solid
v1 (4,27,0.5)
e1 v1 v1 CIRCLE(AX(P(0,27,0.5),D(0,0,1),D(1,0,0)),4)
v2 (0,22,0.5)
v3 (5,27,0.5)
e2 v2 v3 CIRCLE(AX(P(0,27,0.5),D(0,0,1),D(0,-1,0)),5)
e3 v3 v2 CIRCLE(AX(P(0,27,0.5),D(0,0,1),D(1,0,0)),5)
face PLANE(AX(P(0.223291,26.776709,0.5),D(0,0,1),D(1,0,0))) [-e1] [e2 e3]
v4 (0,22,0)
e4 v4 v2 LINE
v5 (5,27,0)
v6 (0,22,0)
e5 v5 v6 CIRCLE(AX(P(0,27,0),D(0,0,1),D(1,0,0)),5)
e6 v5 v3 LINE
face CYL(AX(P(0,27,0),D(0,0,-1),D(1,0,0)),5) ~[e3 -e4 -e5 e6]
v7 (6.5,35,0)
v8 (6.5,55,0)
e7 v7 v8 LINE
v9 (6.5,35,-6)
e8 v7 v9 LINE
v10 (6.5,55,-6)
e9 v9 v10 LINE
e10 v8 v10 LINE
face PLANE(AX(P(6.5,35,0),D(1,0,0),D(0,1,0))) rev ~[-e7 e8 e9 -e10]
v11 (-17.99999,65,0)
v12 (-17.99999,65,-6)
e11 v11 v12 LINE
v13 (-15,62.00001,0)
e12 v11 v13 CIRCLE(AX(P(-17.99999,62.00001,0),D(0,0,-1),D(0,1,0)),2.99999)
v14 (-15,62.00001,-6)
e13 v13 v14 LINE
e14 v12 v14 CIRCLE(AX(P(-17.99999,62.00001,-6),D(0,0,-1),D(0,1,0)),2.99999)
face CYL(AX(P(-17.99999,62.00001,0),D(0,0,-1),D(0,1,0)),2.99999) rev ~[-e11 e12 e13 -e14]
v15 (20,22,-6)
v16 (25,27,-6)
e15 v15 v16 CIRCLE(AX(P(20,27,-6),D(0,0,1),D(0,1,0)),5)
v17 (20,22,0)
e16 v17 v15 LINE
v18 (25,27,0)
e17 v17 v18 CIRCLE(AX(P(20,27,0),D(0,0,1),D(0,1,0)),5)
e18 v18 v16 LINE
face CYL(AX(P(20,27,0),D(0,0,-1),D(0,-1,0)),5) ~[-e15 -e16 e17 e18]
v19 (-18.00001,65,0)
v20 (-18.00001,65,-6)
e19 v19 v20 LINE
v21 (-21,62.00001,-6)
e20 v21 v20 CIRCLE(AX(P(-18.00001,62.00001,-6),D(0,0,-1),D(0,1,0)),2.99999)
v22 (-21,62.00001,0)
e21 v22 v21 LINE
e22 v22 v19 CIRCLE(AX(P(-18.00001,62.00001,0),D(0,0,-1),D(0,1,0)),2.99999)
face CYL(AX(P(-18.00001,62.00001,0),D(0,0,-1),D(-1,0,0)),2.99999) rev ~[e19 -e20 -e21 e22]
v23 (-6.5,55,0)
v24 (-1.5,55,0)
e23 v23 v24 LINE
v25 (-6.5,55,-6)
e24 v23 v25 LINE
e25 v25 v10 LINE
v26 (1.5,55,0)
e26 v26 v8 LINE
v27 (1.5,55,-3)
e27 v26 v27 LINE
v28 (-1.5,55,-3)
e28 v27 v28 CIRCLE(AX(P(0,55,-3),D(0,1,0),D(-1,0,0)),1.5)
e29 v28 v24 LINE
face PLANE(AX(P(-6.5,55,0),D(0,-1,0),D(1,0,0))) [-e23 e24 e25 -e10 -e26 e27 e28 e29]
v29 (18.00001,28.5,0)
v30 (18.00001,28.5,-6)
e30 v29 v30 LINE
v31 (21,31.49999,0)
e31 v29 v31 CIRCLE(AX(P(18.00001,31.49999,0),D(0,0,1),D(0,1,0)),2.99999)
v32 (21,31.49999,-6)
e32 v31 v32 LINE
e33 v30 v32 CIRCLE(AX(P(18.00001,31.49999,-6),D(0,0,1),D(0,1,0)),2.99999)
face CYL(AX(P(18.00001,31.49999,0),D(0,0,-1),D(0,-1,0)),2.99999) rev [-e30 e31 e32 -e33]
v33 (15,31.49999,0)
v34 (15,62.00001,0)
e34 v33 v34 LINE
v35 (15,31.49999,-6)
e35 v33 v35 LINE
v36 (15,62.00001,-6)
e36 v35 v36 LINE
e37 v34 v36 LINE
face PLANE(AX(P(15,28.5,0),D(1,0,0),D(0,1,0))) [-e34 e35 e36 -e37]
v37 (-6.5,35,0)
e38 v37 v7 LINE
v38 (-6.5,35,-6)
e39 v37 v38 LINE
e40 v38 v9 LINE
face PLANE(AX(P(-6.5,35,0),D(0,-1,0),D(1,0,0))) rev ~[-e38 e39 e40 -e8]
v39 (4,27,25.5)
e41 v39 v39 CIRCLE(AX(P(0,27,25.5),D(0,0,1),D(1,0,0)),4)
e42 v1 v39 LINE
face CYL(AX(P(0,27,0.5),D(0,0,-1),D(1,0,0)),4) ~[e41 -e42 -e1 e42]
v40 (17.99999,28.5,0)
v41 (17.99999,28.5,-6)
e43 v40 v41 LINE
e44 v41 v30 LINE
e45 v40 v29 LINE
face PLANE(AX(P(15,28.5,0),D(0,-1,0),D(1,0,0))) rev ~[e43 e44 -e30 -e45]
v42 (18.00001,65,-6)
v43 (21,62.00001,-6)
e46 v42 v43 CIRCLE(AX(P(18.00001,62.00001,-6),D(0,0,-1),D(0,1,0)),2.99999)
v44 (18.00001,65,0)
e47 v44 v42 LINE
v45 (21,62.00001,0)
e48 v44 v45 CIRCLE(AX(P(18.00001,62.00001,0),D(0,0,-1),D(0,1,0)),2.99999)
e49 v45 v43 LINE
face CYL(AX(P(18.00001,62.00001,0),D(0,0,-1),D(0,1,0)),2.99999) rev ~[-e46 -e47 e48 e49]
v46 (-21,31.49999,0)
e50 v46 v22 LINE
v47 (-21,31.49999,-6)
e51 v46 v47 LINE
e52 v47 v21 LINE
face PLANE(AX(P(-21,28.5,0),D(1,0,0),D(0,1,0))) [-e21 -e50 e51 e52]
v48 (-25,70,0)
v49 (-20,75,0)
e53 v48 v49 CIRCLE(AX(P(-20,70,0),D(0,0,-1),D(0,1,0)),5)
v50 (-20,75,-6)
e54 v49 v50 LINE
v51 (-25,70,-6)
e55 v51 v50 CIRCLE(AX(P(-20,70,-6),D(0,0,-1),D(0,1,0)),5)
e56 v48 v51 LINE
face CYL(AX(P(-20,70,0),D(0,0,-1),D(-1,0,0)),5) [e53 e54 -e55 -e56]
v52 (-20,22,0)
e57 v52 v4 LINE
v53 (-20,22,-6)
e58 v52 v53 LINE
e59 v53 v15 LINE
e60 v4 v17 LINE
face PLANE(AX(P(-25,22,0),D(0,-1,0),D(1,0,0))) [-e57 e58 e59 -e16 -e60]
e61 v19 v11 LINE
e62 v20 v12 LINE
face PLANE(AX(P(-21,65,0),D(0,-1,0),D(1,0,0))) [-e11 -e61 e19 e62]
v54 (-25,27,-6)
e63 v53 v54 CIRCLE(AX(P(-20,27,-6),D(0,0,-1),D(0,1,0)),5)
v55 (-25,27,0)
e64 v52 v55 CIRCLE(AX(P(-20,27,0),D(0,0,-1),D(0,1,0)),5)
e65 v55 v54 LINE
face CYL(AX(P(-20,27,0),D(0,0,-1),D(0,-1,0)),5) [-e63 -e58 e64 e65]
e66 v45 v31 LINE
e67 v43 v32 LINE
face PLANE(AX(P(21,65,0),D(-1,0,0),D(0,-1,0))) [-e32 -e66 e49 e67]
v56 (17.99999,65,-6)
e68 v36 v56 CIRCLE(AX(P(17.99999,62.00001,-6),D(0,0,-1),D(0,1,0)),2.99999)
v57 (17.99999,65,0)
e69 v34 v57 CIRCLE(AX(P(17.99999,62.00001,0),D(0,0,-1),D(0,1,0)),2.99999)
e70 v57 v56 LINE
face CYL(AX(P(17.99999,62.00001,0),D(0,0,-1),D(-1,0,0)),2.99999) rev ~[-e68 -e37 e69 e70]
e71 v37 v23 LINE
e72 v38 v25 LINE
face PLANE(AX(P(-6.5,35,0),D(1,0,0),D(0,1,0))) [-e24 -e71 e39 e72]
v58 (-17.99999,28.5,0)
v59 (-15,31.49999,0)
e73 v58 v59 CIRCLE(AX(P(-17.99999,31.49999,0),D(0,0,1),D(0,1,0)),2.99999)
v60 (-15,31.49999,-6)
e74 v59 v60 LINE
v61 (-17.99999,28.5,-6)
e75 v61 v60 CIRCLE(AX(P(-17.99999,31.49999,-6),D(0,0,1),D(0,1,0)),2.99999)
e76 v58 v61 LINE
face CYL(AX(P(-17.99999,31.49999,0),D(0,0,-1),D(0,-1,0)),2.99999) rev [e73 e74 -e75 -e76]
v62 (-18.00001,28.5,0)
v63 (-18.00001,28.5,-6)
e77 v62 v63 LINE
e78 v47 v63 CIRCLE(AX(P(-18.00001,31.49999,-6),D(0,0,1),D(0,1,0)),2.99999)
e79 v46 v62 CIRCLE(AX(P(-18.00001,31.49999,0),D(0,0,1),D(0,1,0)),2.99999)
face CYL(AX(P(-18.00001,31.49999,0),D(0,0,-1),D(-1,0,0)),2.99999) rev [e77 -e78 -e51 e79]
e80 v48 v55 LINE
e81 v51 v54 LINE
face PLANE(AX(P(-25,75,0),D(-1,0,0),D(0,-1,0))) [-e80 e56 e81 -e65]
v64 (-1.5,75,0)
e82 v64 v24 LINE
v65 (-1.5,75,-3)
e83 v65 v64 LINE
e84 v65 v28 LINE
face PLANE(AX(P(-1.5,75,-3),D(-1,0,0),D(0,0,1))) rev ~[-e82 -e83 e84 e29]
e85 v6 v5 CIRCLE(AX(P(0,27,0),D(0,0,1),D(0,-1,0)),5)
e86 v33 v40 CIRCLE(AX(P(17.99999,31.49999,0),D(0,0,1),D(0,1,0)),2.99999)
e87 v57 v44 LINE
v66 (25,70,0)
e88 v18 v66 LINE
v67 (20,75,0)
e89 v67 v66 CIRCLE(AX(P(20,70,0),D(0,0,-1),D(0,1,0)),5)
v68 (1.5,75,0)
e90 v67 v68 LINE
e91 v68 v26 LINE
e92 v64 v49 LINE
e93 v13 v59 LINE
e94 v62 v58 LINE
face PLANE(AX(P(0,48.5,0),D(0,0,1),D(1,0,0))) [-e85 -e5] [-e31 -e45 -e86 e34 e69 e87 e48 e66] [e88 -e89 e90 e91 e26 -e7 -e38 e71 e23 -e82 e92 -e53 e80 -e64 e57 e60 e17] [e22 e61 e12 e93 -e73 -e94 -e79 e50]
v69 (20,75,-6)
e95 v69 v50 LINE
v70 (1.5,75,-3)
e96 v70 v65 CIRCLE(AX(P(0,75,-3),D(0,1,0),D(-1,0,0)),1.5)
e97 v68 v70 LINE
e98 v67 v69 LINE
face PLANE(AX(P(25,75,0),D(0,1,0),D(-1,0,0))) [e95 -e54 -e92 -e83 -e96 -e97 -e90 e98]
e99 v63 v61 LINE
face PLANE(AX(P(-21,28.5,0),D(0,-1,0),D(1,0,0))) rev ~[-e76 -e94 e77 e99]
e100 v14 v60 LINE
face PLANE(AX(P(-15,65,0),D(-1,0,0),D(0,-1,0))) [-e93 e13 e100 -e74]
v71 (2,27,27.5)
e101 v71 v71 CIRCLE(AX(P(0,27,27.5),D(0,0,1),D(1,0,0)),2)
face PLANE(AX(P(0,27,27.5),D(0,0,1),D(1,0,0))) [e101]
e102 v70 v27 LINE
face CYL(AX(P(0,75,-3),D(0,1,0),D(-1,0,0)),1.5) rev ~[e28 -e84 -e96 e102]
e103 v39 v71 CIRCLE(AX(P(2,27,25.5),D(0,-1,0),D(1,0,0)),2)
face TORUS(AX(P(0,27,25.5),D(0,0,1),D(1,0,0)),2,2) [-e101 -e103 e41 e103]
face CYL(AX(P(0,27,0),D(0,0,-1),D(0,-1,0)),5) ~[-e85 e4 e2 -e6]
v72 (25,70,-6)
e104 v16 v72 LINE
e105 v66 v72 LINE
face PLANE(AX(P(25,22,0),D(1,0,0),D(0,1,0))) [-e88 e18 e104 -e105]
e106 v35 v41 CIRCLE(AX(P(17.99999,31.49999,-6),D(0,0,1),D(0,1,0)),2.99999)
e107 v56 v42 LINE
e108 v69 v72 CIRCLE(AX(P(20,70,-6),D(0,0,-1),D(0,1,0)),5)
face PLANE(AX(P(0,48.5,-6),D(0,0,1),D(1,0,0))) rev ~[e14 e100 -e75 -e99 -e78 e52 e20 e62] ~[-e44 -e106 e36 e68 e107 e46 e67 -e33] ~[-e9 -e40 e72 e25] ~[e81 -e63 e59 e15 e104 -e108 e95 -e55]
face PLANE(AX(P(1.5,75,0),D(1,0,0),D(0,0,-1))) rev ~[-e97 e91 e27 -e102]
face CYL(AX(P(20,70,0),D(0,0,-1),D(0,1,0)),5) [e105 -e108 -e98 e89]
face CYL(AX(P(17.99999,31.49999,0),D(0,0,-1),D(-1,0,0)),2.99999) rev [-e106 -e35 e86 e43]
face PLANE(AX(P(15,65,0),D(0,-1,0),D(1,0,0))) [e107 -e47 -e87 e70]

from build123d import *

# Parameters (mm, degrees)
F0_W     = 13
F0_H     = 20
F0_R     = 4
F0_W_2   = 6
F0_H_2   = 3.5
F1_DEPTH = 6
F2_DEPTH = 0.5
F3_R     = 4
F4_DEPTH = 27
F5_R     = 2
F7_DEPTH = 20
F8_R     = 5
F9_R     = 2.99999


# Not quite as in the source:
# - a fillet or chamfer is up to 0.001 mm smaller than in the source, because OpenCascade refuses the exact size


with BuildPart() as f1:
    # F0 (on Top) → F1 (new body)
    with BuildSketch(Plane.XY):
        Polygon((25, 75), (-25, 75), (-25, 22), (0, 22), (25, 22), align=None)
        Polygon((-21, 28.5), (-21, 65), (-15, 65), (-15, 28.5), (-15, 25), (-21, 25), align=None, mode=Mode.SUBTRACT)
        with BuildLine():
            ThreePointArc((5, 27), (3.5355339059, 23.4644660941), (0, 22))
            ThreePointArc((0, 22), (-3.5355339059, 30.5355339059), (5, 27))
        make_face(mode=Mode.SUBTRACT)
        with Locations((0, 45)):
            Rectangle(F0_W, F0_H, mode=Mode.SUBTRACT)
        Polygon((21, 25), (15, 25), (15, 28.5), (15, 65), (21, 65), (21, 28.5), align=None, mode=Mode.SUBTRACT)
        with BuildLine():
            ThreePointArc((5, 27), (-3.5355339059, 30.5355339059), (0, 22))
            ThreePointArc((0, 22), (3.5355339059, 23.4644660941), (5, 27))
        make_face()
        with Locations((0, 27)):
            Circle(F0_R, mode=Mode.SUBTRACT)
        with Locations((0, 27)):
            Circle(F0_R)
        with Locations((18, 26.75)):
            Rectangle(F0_W_2, F0_H_2)
        with Locations((-18, 26.75)):
            Rectangle(F0_W_2, F0_H_2)
    extrude(amount=-F1_DEPTH)

    # F0 (on Top) → F2 (join)
    with BuildSketch(Plane.XY):
        with BuildLine():
            ThreePointArc((5, 27), (-3.5355339059, 30.5355339059), (0, 22))
            ThreePointArc((0, 22), (3.5355339059, 23.4644660941), (5, 27))
        make_face()
        with Locations((0, 27)):
            Circle(F0_R, mode=Mode.SUBTRACT)
        with Locations((0, 27)):
            Circle(F0_R)
    extrude(amount=F2_DEPTH)

    # F3 (on face) → F4 (join)
    with BuildSketch(Plane.XY.offset(0.5)):
        with Locations((0, 27)):
            Circle(F3_R)
    extrude(amount=F4_DEPTH)

    # F5
    f5_edges = [f1.edges().sort_by_distance(p)[0] for p in [
        (-4, 27, 27.5),
    ]]
    fillet(f5_edges, radius=F5_R)

    # F6 (on face) → F7 (cut, through all)
    with BuildSketch(Plane(origin=(0, 75, 0), x_dir=(-1, 0, 0), z_dir=(0, 1, 0))):
        with BuildLine():
            ThreePointArc((-1.5, -3), (0, -4.5), (1.5, -3))
            ThreePointArc((1.5, -3), (0, -1.5), (-1.5, -3))
        make_face()
        with BuildLine():
            ThreePointArc((-1.5, -3), (0, -1.5), (1.5, -3))
            Line((1.5, -3), (1.5, 0))
            Line((1.5, 0), (-1.5, 0))
            Line((-1.5, 0), (-1.5, -3))
        make_face()
    extrude(amount=-F7_DEPTH, mode=Mode.SUBTRACT)

    # F8
    f8_edges = [f1.edges().sort_by_distance(p)[0] for p in [
        (25, 75, -3),
        (-25, 75, -3),
        (-25, 22, -3),
        (25, 22, -3),
    ]]
    fillet(f8_edges, radius=F8_R)

    # F9 (radius 3 in the source; OpenCascade refuses exactly that, so slightly less here)
    f9_edges = [f1.edges().sort_by_distance(p)[0] for p in [
        (-15, 28.5, -3),
        (-21, 28.5, -3),
        (21, 28.5, -3),
        (15, 28.5, -3),
        (21, 65, -3),
        (-15, 65, -3),
        (-21, 65, -3),
        (15, 65, -3),
    ]]
    fillet(f9_edges, radius=F9_R)


solid = f1.part
